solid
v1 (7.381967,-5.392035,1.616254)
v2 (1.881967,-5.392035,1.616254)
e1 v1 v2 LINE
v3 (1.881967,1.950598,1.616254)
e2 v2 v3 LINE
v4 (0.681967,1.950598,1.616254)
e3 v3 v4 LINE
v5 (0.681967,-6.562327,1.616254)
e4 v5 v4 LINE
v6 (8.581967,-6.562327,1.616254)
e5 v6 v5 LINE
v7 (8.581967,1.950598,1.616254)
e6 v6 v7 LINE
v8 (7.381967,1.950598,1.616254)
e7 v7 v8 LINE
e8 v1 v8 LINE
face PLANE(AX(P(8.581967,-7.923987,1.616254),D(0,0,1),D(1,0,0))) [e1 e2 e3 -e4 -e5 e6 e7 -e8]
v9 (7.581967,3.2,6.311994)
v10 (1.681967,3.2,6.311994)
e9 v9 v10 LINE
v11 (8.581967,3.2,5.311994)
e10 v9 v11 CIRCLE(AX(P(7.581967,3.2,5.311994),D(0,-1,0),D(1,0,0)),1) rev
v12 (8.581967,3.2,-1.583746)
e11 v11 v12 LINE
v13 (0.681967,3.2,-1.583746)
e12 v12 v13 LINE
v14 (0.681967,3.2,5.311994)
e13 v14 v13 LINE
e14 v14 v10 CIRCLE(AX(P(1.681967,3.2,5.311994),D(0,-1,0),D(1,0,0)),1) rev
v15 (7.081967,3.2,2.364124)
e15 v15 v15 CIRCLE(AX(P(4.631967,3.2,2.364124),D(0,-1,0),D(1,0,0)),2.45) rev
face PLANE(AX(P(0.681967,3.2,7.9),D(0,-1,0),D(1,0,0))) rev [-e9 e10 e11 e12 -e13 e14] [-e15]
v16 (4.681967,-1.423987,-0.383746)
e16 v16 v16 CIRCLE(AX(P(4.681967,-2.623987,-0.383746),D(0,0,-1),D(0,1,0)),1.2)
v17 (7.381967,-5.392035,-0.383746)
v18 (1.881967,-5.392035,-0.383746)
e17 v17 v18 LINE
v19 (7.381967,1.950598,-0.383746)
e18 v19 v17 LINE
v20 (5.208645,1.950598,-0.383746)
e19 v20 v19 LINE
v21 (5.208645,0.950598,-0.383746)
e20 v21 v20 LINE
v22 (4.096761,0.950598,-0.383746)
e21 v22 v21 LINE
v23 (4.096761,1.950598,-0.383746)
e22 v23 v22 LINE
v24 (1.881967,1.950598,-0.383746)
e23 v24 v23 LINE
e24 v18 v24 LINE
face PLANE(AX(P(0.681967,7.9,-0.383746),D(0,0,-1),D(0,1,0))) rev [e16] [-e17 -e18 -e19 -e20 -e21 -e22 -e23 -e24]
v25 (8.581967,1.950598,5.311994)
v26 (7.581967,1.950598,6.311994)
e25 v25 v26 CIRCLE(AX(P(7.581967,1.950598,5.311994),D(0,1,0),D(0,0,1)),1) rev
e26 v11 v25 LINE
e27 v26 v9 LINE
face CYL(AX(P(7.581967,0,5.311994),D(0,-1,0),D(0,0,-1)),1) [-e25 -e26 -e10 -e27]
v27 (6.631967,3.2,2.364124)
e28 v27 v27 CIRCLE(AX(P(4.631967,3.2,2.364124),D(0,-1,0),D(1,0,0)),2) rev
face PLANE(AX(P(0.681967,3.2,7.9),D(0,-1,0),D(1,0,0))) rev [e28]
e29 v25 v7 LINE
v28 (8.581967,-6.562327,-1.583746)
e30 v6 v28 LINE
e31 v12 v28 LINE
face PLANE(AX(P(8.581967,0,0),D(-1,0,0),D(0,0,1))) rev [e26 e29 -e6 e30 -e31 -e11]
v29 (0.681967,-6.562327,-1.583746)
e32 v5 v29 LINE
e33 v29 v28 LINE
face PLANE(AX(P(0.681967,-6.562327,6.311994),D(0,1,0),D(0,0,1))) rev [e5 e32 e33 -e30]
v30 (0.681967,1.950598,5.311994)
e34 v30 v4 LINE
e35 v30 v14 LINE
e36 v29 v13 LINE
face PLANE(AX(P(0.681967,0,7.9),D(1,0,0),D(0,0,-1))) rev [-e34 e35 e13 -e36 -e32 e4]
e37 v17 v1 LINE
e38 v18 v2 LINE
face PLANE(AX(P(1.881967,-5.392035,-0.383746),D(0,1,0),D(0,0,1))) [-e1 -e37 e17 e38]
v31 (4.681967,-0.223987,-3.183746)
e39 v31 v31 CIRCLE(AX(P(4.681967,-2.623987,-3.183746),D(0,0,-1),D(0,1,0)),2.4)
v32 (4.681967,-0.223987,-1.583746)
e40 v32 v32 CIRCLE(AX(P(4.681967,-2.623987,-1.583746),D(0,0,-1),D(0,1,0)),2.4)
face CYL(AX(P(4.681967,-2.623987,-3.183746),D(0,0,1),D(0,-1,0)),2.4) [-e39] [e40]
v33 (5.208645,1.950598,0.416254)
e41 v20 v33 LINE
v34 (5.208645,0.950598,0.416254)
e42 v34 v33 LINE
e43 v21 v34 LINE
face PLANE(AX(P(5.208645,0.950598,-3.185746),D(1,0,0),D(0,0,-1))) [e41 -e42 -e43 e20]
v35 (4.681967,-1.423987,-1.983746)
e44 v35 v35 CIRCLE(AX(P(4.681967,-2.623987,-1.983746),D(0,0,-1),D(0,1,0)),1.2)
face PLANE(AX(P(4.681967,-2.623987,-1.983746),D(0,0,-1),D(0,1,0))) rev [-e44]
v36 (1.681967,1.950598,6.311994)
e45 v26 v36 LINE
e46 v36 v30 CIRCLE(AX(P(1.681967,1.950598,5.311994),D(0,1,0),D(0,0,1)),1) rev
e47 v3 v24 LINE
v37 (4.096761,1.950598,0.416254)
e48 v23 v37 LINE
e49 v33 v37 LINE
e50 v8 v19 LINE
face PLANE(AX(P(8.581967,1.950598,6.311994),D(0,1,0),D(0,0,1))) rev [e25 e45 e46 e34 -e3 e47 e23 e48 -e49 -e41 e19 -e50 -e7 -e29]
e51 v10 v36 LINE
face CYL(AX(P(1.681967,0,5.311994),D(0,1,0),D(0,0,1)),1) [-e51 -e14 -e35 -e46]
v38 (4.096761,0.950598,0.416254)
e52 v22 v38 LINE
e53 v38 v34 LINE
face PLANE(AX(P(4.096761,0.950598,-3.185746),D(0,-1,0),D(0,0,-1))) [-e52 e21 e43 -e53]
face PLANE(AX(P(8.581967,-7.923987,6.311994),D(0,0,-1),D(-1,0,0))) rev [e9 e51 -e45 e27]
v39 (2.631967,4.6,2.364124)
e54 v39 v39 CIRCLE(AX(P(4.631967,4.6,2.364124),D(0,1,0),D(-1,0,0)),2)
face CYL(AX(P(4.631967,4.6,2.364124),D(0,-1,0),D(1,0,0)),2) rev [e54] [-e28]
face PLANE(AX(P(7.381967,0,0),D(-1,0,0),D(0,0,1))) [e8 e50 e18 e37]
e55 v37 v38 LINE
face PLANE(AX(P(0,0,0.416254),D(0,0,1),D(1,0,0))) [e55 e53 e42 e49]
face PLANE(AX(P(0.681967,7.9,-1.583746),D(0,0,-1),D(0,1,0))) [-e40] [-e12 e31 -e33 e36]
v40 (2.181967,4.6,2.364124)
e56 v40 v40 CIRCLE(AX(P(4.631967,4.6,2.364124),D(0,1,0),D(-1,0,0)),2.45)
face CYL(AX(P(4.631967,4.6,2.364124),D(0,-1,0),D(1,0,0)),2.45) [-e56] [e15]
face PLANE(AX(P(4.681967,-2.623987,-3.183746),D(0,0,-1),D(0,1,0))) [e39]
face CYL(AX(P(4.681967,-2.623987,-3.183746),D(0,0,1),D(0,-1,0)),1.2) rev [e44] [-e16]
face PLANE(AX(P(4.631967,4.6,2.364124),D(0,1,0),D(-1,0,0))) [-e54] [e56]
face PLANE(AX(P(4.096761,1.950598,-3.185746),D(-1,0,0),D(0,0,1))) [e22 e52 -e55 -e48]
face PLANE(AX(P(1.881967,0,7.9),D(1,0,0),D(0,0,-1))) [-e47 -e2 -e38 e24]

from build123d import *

# Parameters (mm, degrees)
MAINBASESKETCH_W             = 15.8
MAINBASESKETCH_H             = 3.2
MAINBASEEXTRUDE_DEPTH        = 7.9
STUDSSKETCH_R                = 2.4
STUDSEXTRUDE_DEPTH           = 1.6
STUDSPATTERN_COUNT           = 2
STUDSPATTERN_PITCH           = 8
STUDSPATTERN_COUNT_DIR2      = 2
STUDSPATTERN_PITCH_DIR2      = 8
LCUTBLUE_DEPTH               = 19.555463972
LCUTBLUE_DEPTH_BACK          = 19.555463972
MADESLIMCUTSKETCH_W          = 7.9
MADESLIMCUTSKETCH_H          = 7.9
MADESLIMCUT_DEPTH            = 19.897228453
SHORTLEXTENSIONSKETCH_W      = 1.583745828
SHORTLEXTENSIONSKETCH_H      = 7.9
SHORTLUPPERCIRCLES_START     = -0.2
SHORTLUPPERCIRCLESSKETCH_R   = 2.45
SHORTLUPPERCIRCLESSKETCH_R_2 = 2
SHORTLUPPERCIRCLES_DEPTH     = 1.6
CUT_EXTRUDE17_DEPTH          = 7.9
SKETCH63_W                   = 1.583745828
SKETCH63_H                   = 7.9
LPATTERN2_START              = -2.983745828
LPATTERN2_OUTLINE_R          = 2.45
LPATTERN2_OUTLINE_R_2        = 2
LPATTERN2_DEPTH              = 1.4
FILLET4_R                    = 1
REMOVEDMATERIAL_DEPTH        = 21.328098686
REMOVEDMATERIAL_DEPTH_BACK   = 21.328098686
SKETCH114_W                  = 7.9
SKETCH114_H                  = 7.87601279
FILLET20_R                   = 1
BOSS_EXTRUDE7_START          = -0.2
SKETCH117_R                  = 2.45
SKETCH117_R_2                = 2
BOSS_EXTRUDE7_DEPTH          = 1.6
SKETCH118_W                  = 1.583745828
SKETCH118_H                  = 4.72398721
CUT_EXTRUDE43_DEPTH          = 14.697064405
SKETCH120_R                  = 2.45
SKETCH120_R_2                = 2
CUT_EXTRUDE44_DEPTH          = 1.6
SKETCH123_W                  = 4.8
SKETCH123_H                  = 1.6
SKETCH123_W_2                = 1.4
SKETCH123_H_2                = 4.9
CUT_EXTRUDE45_DEPTH          = 14.697064405
SKETCH124_R                  = 2.4
BOSS_EXTRUDE11_DEPTH         = 1.6
SKETCH125_W                  = 7.9
SKETCH125_H                  = 1.588006001
CUT_EXTRUDE46_DEPTH          = 17.118413467
BOSS_EXTRUDE12_START         = -0.2
SKETCH126_R                  = 2.45
SKETCH126_R_2                = 2
BOSS_EXTRUDE12_DEPTH         = 1.6
SKETCH128_W                  = 6.311993999
SKETCH128_H                  = 1.950598033
CUT_EXTRUDE47_DEPTH          = 13.846822236
SKETCH129_W                  = 1.616254172
SKETCH129_H                  = 9.874585243
FILLET23_R                   = 1
SHELL8_START                 = -0.383745828
SHELL8_OUTLINE_W             = 5.5
SHELL8_OUTLINE_H             = 8.72398721
SHELL8_DEPTH                 = 2
SHELL8_START_2               = -1.983745828
SHELL8_2_OUTLINE_R           = 1.2
SHELL8_2_DEPTH               = 1.6
BOSS_EXTRUDE13_START         = -7.92398721
BOSS_EXTRUDE13_OUTLINE_W     = 7.9
BOSS_EXTRUDE13_OUTLINE_H     = 3.2
BOSS_EXTRUDE13_DEPTH         = 1
SWEEP22_START                = 1.950598033
SWEEP22_OUTLINE_W            = 5.5
SWEEP22_OUTLINE_H            = 2
SWEEP22_DEPTH                = 0.049401967
BOSS_EXTRUDE14_REACH         = 15.829
BOSS_EXTRUDE14_START         = -1.2
SKETCH133_W                  = 1.111883757
SKETCH133_H                  = 1
SKETCH136_W                  = 7.9
SKETCH136_H                  = 1.361659972
CUT_EXTRUDE48_DEPTH          = 15.099022731
SWEEP23_START                = -0.383745828
SWEEP23_OUTLINE_W            = 5.5
SWEEP23_OUTLINE_H            = 1.170292465
SWEEP23_DEPTH                = 2


# Read off the part's stored shape, not the designer's step: LPattern2, Shell8, Boss-Extrude13, Sweep22, Sweep23
with BuildPart() as part:
    # MainBaseSketch → MainBaseExtrude (new, symmetric)
    with BuildSketch(Plane.XY):
        with Locations((8.581967213, 1.6)):
            Rectangle(MAINBASESKETCH_W, MAINBASESKETCH_H)
    extrude(amount=MAINBASEEXTRUDE_DEPTH, both=True)

    # StudsSketch → StudsExtrude (add)
    with BuildSketch(Plane(origin=(0, 3.2, 0), x_dir=(1, 0, 0), z_dir=(0, 1, 0))):
        with Locations((4.581967213, 4)):
            Circle(STUDSSKETCH_R)
    studsextrude = extrude(amount=STUDSEXTRUDE_DEPTH)

    # StudsPattern: StudsExtrude 2 × 2
    with Locations(*[(j * STUDSPATTERN_PITCH_DIR2, 0, i * STUDSPATTERN_PITCH) for i in range(STUDSPATTERN_COUNT) for j in range(STUDSPATTERN_COUNT_DIR2) if (i, j) != (0, 0)]):
        add(studsextrude)

    # LCUTBlueSketch → LCutBlue (cut, two sides: drawn at the far end of the back side and taken through both)
    with BuildSketch(Plane(origin=(0, 3.2, 0), x_dir=(1, 0, 0), z_dir=(0, 1, 0)).offset(-LCUTBLUE_DEPTH_BACK)):
        Polygon((8.581967213, 53.229874044), (8.581967213, 7.9), (8.581967213, 0), (16.481967213, 0), (61.811841258, 0), (125.917963912, 64.106122654), (72.688089868, 117.335996699), align=None)
    extrude(amount=LCUTBLUE_DEPTH + LCUTBLUE_DEPTH_BACK, mode=Mode.SUBTRACT)

    # MadeSlimCutSketch → MadeSlimCut (cut, through all)
    with BuildSketch(Plane.XZ):
        with Locations((4.631967213, -3.95)):
            Rectangle(MADESLIMCUTSKETCH_W, MADESLIMCUTSKETCH_H)
    extrude(amount=-MADESLIMCUT_DEPTH, mode=Mode.SUBTRACT)

    # ShortLExtension: sweep along a curve in space
    with BuildLine() as shortlextension_path:
        Line((0.681967213, 3.2, 0), (16.481967213, 3.2, 0))
    # ShortLExtensionSketch → ShortLExtension (sweep)
    with BuildSketch(Plane(origin=(16.481967213, 0, 0), x_dir=(0, 0, -1), z_dir=(1, 0, 0))):
        with Locations((0.791872914, 3.95)):
            Rectangle(SHORTLEXTENSIONSKETCH_W, SHORTLEXTENSIONSKETCH_H)
    sweep(path=shortlextension_path.line)

    # ShortLUpperCirclesSketch → ShortLUpperCircles (add)
    # profile 1 of 2: a face of its own
    with BuildSketch(Plane(origin=(0, 0, -1.583745828), x_dir=(-1, 0, 0), z_dir=(0, 0, -1)).offset(SHORTLUPPERCIRCLES_START)):
        with Locations(Location((-12.581967213, 3.95, 0), (0, 0, 90))):
            Circle(SHORTLUPPERCIRCLESSKETCH_R)
        with Locations(Location((-12.581967213, 3.95, 0), (0, 0, 90))):
            Circle(SHORTLUPPERCIRCLESSKETCH_R_2, mode=Mode.SUBTRACT)
    # profile 2 of 2: a face of its own
    with BuildSketch(Plane(origin=(0, 0, -1.583745828), x_dir=(-1, 0, 0), z_dir=(0, 0, -1)).offset(SHORTLUPPERCIRCLES_START)):
        with Locations(Location((-4.581967213, 3.95, 0), (0, 0, 270))):
            Circle(SHORTLUPPERCIRCLESSKETCH_R)
        with Locations(Location((-4.581967213, 3.95, 0), (0, 0, 270))):
            Circle(SHORTLUPPERCIRCLESSKETCH_R_2, mode=Mode.SUBTRACT)
    extrude(amount=SHORTLUPPERCIRCLES_DEPTH)

    # Sketch59 → Cut-Extrude17 (cut)
    with BuildSketch(Plane.ZY.offset(-8.581967213)):
        Polygon((-1.583745828, 6.4), (-1.583745828, 7.9), (0, 7.9), (0, 3.2), (1.6, 3.2), (1.6, 4.8), (6.4, 4.8), (6.4, 3.2), (7.9, 3.2), (7.9, 0), (-1.583745828, 0), (-1.583745828, 1.5), (-2.983745828, 1.5), (-2.983745828, 6.4), align=None)
    extrude(amount=-CUT_EXTRUDE17_DEPTH, mode=Mode.SUBTRACT)

    # Sweep5: sweep along a curve in space
    with BuildLine() as sweep5_path:
        Line((0.681967213, 7.9, 0), (8.581967213, 7.9, 0))
    # Sketch63 → Sweep5 (sweep)
    with BuildSketch(Plane.ZY.offset(-0.681967213)):
        with Locations((-0.791872914, 11.85)):
            Rectangle(SKETCH63_W, SKETCH63_H)
    sweep(path=sweep5_path.line)

    # LPattern2 outline → LPattern2 (add)
    with BuildSketch(Plane.XY.offset(LPATTERN2_START)):
        with Locations((4.581967213, 11.95)):
            Circle(LPATTERN2_OUTLINE_R)
        with Locations((4.581967213, 11.95)):
            Circle(LPATTERN2_OUTLINE_R_2, mode=Mode.SUBTRACT)
    extrude(amount=LPATTERN2_DEPTH)

    # Fillet4
    fillet4_edges = [part.edges().sort_by_distance(p)[0] for p in [
        (0.681967213, 15.8, -0.791872914),
        (8.581967213, 15.8, -0.791872914),
    ]]
    fillet(fillet4_edges, radius=FILLET4_R)

    # Sketch114 → RemovedMaterial (cut, two sides: drawn at the far end of the back side and taken through both)
    with BuildSketch(Plane(origin=(0, 0, -1.583745828), x_dir=(-1, 0, 0), z_dir=(0, 0, -1)).offset(-REMOVEDMATERIAL_DEPTH_BACK)):
        with Locations((-4.631967213, 11.861993605)):
            Rectangle(SKETCH114_W, SKETCH114_H)
    extrude(amount=REMOVEDMATERIAL_DEPTH + REMOVEDMATERIAL_DEPTH_BACK, mode=Mode.SUBTRACT)

    # Fillet20
    fillet20_edges = [part.edges().sort_by_distance(p)[0] for p in [
        (8.581967213, 7.92398721, -0.791872914),
        (0.681967213, 7.92398721, -0.791872914),
    ]]
    fillet(fillet20_edges, radius=FILLET20_R)

    # Sweep20: sweep along a curve in space
    with BuildLine() as sweep20_path:
        Line((0.681967213, 6.92398721, 0), (0.681967213, 6.92398721, -1.583745828))
    # Sketch115 → Sweep20 (sweep)
    with BuildSketch(Plane(origin=(0, 0, -1.583745828), x_dir=(-1, 0, 0), z_dir=(0, 0, -1))):
        with BuildLine():
            Line((-8.581967213, -6.92398721), (-8.581967213, 0))
            Line((-8.581967213, 0), (-0.681967213, 0))
            Line((-0.681967213, 0), (-0.681967213, -6.92398721))
            ThreePointArc((-0.681967213, -6.92398721), (-0.974860432, -7.631093991), (-1.681967213, -7.92398721))
            Line((-1.681967213, -7.92398721), (-7.581967213, -7.92398721))
            ThreePointArc((-7.581967213, -7.92398721), (-8.289073994, -7.631093991), (-8.581967213, -6.92398721))
        make_face()
    sweep(path=sweep20_path.line)

    # Sketch117 → Boss-Extrude7 (add)
    with BuildSketch(Plane(origin=(0, 0, -1.583745828), x_dir=(-1, 0, 0), z_dir=(0, 0, -1)).offset(BOSS_EXTRUDE7_START)):
        with Locations(Location((-4.631967213, -3.961993605, 0), (0, 0, 90))):
            Circle(SKETCH117_R)
        with Locations(Location((-4.631967213, -3.961993605, 0), (0, 0, 90))):
            Circle(SKETCH117_R_2, mode=Mode.SUBTRACT)
    extrude(amount=BOSS_EXTRUDE7_DEPTH)

    # Sketch118 → Cut-Extrude43 (cut, through all)
    with BuildSketch(Plane.ZY.offset(-0.681967213)):
        with Locations((-0.791872914, 5.561993605)):
            Rectangle(SKETCH118_W, SKETCH118_H)
    extrude(amount=-CUT_EXTRUDE43_DEPTH, mode=Mode.SUBTRACT)

    # Sketch120 → Cut-Extrude44 (cut)
    with BuildSketch(Plane(origin=(0, 0, -1.583745828), x_dir=(-1, 0, 0), z_dir=(0, 0, -1))):
        with Locations((-4.581967213, 3.95)):
            Circle(SKETCH120_R)
        with Locations((-4.581967213, 3.95)):
            Circle(SKETCH120_R_2, mode=Mode.SUBTRACT)
    extrude(amount=CUT_EXTRUDE44_DEPTH, mode=Mode.SUBTRACT)

    # Sketch123 → Cut-Extrude45 (cut, through all)
    with BuildSketch(Plane.ZY.offset(-0.681967213)):
        with Locations((4, 4)):
            Rectangle(SKETCH123_W, SKETCH123_H)
        with Locations((-2.283745828, -3.961993605)):
            Rectangle(SKETCH123_W_2, SKETCH123_H_2)
    extrude(amount=-CUT_EXTRUDE45_DEPTH, mode=Mode.SUBTRACT)

    # Sketch124 → Boss-Extrude11 (add)
    with BuildSketch(Plane(origin=(0, 0, -1.583745828), x_dir=(-1, 0, 0), z_dir=(0, 0, -1))):
        with Locations(Location((-4.681967213, -2.62398721, 0), (0, 0, 90))):
            Circle(SKETCH124_R)
    extrude(amount=BOSS_EXTRUDE11_DEPTH)

    # Sketch125 → Cut-Extrude46 (cut, through all)
    with BuildSketch(Plane(origin=(0, 3.2, 0), x_dir=(1, 0, 0), z_dir=(0, 1, 0))):
        with Locations((4.631967213, -7.105997)):
            Rectangle(SKETCH125_W, SKETCH125_H)
    extrude(amount=-CUT_EXTRUDE46_DEPTH, mode=Mode.SUBTRACT)

    # Sketch126 → Boss-Extrude12 (add)
    with BuildSketch(Plane(origin=(0, 3.2, 0), x_dir=(1, 0, 0), z_dir=(0, 1, 0)).offset(BOSS_EXTRUDE12_START)):
        with Locations((4.631967213, -2.364124086)):
            Circle(SKETCH126_R)
        with Locations((4.631967213, -2.364124086)):
            Circle(SKETCH126_R_2, mode=Mode.SUBTRACT)
    extrude(amount=BOSS_EXTRUDE12_DEPTH)

    # Sketch128 → Cut-Extrude47 (cut, through all)
    with BuildSketch(Plane.ZY.offset(-0.681967213)):
        with Locations((3.155997, 0.975299017)):
            Rectangle(SKETCH128_W, SKETCH128_H)
    extrude(amount=-CUT_EXTRUDE47_DEPTH, mode=Mode.SUBTRACT)

    # Sweep21: sweep along a curve in space
    with BuildLine() as sweep21_path:
        Line((8.581967213, 1.950598033, 0), (0.681967213, 1.950598033, 0))
    # Sketch129 → Sweep21 (sweep)
    with BuildSketch(Plane.ZY.offset(-0.681967213)):
        with Locations((0.808127086, -2.986694589)):
            Rectangle(SKETCH129_W, SKETCH129_H)
    sweep(path=sweep21_path.line)

    # Fillet23
    fillet23_edges = [part.edges().sort_by_distance(p)[0] for p in [
        (8.581967213, 2.575299016, 6.311993999),
        (0.681967213, 2.575299016, 6.311993999),
        (0.681967213, -7.92398721, 0.808127086),
        (8.581967213, -7.92398721, 0.808127086),
    ]]
    fillet(fillet23_edges, radius=FILLET23_R)

    # Shell8 outline → Shell8 (cut)
    with BuildSketch(Plane.XY.offset(SHELL8_START)):
        with Locations((4.631967213, -2.361993605)):
            Rectangle(SHELL8_OUTLINE_W, SHELL8_OUTLINE_H)
    extrude(amount=SHELL8_DEPTH, mode=Mode.SUBTRACT)

    # Shell8 2 outline → Shell8 2 (cut)
    with BuildSketch(Plane.XY.offset(SHELL8_START_2)):
        with Locations((4.681967213, -2.62398721)):
            Circle(SHELL8_2_OUTLINE_R)
    extrude(amount=SHELL8_2_DEPTH, mode=Mode.SUBTRACT)

    # Boss-Extrude13 outline → Boss-Extrude13 (add)
    with BuildSketch(Plane(origin=(0, 0, 0), x_dir=(1, 0, 0), z_dir=(0, 1, 0)).offset(BOSS_EXTRUDE13_START)):
        with Locations((4.631967213, -0.016254172)):
            Rectangle(BOSS_EXTRUDE13_OUTLINE_W, BOSS_EXTRUDE13_OUTLINE_H)
    extrude(amount=BOSS_EXTRUDE13_DEPTH)

    # Sweep22 outline → Sweep22 (add)
    with BuildSketch(Plane(origin=(0, 0, 0), x_dir=(1, 0, 0), z_dir=(0, 1, 0)).offset(SWEEP22_START)):
        with Locations((4.631967213, -0.616254172)):
            Rectangle(SWEEP22_OUTLINE_W, SWEEP22_OUTLINE_H)
    extrude(amount=SWEEP22_DEPTH)

    # Sketch133 → Boss-Extrude14 (add, up to next)
    with BuildSketch(Plane.XY.offset(1.616254172).offset(BOSS_EXTRUDE14_START), mode=Mode.PRIVATE) as boss_extrude14_sk1:
        with Locations((4.652702787, 1.450598033)):
            Rectangle(SKETCH133_W, SKETCH133_H)
    boss_extrude14_tool1 = extrude(boss_extrude14_sk1.sketch, amount=-BOSS_EXTRUDE14_REACH, mode=Mode.PRIVATE) - part.part
    add(boss_extrude14_tool1.solids().sort_by_distance((4.652703, 1.450598, 0.416254))[0])

    # Sketch136 → Cut-Extrude48 (cut, through all)
    with BuildSketch(Plane(origin=(0, 0, -1.583745828), x_dir=(-1, 0, 0), z_dir=(0, 0, -1))):
        with Locations((-4.631967213, -7.243157224)):
            Rectangle(SKETCH136_W, SKETCH136_H)
    extrude(amount=-CUT_EXTRUDE48_DEPTH, mode=Mode.SUBTRACT)

    # Sweep23 outline → Sweep23 (add)
    with BuildSketch(Plane.XY.offset(SWEEP23_START)):
        with Locations((4.631967213, -5.977181006)):
            Rectangle(SWEEP23_OUTLINE_W, SWEEP23_OUTLINE_H)
    extrude(amount=SWEEP23_DEPTH)


solid = part.part
